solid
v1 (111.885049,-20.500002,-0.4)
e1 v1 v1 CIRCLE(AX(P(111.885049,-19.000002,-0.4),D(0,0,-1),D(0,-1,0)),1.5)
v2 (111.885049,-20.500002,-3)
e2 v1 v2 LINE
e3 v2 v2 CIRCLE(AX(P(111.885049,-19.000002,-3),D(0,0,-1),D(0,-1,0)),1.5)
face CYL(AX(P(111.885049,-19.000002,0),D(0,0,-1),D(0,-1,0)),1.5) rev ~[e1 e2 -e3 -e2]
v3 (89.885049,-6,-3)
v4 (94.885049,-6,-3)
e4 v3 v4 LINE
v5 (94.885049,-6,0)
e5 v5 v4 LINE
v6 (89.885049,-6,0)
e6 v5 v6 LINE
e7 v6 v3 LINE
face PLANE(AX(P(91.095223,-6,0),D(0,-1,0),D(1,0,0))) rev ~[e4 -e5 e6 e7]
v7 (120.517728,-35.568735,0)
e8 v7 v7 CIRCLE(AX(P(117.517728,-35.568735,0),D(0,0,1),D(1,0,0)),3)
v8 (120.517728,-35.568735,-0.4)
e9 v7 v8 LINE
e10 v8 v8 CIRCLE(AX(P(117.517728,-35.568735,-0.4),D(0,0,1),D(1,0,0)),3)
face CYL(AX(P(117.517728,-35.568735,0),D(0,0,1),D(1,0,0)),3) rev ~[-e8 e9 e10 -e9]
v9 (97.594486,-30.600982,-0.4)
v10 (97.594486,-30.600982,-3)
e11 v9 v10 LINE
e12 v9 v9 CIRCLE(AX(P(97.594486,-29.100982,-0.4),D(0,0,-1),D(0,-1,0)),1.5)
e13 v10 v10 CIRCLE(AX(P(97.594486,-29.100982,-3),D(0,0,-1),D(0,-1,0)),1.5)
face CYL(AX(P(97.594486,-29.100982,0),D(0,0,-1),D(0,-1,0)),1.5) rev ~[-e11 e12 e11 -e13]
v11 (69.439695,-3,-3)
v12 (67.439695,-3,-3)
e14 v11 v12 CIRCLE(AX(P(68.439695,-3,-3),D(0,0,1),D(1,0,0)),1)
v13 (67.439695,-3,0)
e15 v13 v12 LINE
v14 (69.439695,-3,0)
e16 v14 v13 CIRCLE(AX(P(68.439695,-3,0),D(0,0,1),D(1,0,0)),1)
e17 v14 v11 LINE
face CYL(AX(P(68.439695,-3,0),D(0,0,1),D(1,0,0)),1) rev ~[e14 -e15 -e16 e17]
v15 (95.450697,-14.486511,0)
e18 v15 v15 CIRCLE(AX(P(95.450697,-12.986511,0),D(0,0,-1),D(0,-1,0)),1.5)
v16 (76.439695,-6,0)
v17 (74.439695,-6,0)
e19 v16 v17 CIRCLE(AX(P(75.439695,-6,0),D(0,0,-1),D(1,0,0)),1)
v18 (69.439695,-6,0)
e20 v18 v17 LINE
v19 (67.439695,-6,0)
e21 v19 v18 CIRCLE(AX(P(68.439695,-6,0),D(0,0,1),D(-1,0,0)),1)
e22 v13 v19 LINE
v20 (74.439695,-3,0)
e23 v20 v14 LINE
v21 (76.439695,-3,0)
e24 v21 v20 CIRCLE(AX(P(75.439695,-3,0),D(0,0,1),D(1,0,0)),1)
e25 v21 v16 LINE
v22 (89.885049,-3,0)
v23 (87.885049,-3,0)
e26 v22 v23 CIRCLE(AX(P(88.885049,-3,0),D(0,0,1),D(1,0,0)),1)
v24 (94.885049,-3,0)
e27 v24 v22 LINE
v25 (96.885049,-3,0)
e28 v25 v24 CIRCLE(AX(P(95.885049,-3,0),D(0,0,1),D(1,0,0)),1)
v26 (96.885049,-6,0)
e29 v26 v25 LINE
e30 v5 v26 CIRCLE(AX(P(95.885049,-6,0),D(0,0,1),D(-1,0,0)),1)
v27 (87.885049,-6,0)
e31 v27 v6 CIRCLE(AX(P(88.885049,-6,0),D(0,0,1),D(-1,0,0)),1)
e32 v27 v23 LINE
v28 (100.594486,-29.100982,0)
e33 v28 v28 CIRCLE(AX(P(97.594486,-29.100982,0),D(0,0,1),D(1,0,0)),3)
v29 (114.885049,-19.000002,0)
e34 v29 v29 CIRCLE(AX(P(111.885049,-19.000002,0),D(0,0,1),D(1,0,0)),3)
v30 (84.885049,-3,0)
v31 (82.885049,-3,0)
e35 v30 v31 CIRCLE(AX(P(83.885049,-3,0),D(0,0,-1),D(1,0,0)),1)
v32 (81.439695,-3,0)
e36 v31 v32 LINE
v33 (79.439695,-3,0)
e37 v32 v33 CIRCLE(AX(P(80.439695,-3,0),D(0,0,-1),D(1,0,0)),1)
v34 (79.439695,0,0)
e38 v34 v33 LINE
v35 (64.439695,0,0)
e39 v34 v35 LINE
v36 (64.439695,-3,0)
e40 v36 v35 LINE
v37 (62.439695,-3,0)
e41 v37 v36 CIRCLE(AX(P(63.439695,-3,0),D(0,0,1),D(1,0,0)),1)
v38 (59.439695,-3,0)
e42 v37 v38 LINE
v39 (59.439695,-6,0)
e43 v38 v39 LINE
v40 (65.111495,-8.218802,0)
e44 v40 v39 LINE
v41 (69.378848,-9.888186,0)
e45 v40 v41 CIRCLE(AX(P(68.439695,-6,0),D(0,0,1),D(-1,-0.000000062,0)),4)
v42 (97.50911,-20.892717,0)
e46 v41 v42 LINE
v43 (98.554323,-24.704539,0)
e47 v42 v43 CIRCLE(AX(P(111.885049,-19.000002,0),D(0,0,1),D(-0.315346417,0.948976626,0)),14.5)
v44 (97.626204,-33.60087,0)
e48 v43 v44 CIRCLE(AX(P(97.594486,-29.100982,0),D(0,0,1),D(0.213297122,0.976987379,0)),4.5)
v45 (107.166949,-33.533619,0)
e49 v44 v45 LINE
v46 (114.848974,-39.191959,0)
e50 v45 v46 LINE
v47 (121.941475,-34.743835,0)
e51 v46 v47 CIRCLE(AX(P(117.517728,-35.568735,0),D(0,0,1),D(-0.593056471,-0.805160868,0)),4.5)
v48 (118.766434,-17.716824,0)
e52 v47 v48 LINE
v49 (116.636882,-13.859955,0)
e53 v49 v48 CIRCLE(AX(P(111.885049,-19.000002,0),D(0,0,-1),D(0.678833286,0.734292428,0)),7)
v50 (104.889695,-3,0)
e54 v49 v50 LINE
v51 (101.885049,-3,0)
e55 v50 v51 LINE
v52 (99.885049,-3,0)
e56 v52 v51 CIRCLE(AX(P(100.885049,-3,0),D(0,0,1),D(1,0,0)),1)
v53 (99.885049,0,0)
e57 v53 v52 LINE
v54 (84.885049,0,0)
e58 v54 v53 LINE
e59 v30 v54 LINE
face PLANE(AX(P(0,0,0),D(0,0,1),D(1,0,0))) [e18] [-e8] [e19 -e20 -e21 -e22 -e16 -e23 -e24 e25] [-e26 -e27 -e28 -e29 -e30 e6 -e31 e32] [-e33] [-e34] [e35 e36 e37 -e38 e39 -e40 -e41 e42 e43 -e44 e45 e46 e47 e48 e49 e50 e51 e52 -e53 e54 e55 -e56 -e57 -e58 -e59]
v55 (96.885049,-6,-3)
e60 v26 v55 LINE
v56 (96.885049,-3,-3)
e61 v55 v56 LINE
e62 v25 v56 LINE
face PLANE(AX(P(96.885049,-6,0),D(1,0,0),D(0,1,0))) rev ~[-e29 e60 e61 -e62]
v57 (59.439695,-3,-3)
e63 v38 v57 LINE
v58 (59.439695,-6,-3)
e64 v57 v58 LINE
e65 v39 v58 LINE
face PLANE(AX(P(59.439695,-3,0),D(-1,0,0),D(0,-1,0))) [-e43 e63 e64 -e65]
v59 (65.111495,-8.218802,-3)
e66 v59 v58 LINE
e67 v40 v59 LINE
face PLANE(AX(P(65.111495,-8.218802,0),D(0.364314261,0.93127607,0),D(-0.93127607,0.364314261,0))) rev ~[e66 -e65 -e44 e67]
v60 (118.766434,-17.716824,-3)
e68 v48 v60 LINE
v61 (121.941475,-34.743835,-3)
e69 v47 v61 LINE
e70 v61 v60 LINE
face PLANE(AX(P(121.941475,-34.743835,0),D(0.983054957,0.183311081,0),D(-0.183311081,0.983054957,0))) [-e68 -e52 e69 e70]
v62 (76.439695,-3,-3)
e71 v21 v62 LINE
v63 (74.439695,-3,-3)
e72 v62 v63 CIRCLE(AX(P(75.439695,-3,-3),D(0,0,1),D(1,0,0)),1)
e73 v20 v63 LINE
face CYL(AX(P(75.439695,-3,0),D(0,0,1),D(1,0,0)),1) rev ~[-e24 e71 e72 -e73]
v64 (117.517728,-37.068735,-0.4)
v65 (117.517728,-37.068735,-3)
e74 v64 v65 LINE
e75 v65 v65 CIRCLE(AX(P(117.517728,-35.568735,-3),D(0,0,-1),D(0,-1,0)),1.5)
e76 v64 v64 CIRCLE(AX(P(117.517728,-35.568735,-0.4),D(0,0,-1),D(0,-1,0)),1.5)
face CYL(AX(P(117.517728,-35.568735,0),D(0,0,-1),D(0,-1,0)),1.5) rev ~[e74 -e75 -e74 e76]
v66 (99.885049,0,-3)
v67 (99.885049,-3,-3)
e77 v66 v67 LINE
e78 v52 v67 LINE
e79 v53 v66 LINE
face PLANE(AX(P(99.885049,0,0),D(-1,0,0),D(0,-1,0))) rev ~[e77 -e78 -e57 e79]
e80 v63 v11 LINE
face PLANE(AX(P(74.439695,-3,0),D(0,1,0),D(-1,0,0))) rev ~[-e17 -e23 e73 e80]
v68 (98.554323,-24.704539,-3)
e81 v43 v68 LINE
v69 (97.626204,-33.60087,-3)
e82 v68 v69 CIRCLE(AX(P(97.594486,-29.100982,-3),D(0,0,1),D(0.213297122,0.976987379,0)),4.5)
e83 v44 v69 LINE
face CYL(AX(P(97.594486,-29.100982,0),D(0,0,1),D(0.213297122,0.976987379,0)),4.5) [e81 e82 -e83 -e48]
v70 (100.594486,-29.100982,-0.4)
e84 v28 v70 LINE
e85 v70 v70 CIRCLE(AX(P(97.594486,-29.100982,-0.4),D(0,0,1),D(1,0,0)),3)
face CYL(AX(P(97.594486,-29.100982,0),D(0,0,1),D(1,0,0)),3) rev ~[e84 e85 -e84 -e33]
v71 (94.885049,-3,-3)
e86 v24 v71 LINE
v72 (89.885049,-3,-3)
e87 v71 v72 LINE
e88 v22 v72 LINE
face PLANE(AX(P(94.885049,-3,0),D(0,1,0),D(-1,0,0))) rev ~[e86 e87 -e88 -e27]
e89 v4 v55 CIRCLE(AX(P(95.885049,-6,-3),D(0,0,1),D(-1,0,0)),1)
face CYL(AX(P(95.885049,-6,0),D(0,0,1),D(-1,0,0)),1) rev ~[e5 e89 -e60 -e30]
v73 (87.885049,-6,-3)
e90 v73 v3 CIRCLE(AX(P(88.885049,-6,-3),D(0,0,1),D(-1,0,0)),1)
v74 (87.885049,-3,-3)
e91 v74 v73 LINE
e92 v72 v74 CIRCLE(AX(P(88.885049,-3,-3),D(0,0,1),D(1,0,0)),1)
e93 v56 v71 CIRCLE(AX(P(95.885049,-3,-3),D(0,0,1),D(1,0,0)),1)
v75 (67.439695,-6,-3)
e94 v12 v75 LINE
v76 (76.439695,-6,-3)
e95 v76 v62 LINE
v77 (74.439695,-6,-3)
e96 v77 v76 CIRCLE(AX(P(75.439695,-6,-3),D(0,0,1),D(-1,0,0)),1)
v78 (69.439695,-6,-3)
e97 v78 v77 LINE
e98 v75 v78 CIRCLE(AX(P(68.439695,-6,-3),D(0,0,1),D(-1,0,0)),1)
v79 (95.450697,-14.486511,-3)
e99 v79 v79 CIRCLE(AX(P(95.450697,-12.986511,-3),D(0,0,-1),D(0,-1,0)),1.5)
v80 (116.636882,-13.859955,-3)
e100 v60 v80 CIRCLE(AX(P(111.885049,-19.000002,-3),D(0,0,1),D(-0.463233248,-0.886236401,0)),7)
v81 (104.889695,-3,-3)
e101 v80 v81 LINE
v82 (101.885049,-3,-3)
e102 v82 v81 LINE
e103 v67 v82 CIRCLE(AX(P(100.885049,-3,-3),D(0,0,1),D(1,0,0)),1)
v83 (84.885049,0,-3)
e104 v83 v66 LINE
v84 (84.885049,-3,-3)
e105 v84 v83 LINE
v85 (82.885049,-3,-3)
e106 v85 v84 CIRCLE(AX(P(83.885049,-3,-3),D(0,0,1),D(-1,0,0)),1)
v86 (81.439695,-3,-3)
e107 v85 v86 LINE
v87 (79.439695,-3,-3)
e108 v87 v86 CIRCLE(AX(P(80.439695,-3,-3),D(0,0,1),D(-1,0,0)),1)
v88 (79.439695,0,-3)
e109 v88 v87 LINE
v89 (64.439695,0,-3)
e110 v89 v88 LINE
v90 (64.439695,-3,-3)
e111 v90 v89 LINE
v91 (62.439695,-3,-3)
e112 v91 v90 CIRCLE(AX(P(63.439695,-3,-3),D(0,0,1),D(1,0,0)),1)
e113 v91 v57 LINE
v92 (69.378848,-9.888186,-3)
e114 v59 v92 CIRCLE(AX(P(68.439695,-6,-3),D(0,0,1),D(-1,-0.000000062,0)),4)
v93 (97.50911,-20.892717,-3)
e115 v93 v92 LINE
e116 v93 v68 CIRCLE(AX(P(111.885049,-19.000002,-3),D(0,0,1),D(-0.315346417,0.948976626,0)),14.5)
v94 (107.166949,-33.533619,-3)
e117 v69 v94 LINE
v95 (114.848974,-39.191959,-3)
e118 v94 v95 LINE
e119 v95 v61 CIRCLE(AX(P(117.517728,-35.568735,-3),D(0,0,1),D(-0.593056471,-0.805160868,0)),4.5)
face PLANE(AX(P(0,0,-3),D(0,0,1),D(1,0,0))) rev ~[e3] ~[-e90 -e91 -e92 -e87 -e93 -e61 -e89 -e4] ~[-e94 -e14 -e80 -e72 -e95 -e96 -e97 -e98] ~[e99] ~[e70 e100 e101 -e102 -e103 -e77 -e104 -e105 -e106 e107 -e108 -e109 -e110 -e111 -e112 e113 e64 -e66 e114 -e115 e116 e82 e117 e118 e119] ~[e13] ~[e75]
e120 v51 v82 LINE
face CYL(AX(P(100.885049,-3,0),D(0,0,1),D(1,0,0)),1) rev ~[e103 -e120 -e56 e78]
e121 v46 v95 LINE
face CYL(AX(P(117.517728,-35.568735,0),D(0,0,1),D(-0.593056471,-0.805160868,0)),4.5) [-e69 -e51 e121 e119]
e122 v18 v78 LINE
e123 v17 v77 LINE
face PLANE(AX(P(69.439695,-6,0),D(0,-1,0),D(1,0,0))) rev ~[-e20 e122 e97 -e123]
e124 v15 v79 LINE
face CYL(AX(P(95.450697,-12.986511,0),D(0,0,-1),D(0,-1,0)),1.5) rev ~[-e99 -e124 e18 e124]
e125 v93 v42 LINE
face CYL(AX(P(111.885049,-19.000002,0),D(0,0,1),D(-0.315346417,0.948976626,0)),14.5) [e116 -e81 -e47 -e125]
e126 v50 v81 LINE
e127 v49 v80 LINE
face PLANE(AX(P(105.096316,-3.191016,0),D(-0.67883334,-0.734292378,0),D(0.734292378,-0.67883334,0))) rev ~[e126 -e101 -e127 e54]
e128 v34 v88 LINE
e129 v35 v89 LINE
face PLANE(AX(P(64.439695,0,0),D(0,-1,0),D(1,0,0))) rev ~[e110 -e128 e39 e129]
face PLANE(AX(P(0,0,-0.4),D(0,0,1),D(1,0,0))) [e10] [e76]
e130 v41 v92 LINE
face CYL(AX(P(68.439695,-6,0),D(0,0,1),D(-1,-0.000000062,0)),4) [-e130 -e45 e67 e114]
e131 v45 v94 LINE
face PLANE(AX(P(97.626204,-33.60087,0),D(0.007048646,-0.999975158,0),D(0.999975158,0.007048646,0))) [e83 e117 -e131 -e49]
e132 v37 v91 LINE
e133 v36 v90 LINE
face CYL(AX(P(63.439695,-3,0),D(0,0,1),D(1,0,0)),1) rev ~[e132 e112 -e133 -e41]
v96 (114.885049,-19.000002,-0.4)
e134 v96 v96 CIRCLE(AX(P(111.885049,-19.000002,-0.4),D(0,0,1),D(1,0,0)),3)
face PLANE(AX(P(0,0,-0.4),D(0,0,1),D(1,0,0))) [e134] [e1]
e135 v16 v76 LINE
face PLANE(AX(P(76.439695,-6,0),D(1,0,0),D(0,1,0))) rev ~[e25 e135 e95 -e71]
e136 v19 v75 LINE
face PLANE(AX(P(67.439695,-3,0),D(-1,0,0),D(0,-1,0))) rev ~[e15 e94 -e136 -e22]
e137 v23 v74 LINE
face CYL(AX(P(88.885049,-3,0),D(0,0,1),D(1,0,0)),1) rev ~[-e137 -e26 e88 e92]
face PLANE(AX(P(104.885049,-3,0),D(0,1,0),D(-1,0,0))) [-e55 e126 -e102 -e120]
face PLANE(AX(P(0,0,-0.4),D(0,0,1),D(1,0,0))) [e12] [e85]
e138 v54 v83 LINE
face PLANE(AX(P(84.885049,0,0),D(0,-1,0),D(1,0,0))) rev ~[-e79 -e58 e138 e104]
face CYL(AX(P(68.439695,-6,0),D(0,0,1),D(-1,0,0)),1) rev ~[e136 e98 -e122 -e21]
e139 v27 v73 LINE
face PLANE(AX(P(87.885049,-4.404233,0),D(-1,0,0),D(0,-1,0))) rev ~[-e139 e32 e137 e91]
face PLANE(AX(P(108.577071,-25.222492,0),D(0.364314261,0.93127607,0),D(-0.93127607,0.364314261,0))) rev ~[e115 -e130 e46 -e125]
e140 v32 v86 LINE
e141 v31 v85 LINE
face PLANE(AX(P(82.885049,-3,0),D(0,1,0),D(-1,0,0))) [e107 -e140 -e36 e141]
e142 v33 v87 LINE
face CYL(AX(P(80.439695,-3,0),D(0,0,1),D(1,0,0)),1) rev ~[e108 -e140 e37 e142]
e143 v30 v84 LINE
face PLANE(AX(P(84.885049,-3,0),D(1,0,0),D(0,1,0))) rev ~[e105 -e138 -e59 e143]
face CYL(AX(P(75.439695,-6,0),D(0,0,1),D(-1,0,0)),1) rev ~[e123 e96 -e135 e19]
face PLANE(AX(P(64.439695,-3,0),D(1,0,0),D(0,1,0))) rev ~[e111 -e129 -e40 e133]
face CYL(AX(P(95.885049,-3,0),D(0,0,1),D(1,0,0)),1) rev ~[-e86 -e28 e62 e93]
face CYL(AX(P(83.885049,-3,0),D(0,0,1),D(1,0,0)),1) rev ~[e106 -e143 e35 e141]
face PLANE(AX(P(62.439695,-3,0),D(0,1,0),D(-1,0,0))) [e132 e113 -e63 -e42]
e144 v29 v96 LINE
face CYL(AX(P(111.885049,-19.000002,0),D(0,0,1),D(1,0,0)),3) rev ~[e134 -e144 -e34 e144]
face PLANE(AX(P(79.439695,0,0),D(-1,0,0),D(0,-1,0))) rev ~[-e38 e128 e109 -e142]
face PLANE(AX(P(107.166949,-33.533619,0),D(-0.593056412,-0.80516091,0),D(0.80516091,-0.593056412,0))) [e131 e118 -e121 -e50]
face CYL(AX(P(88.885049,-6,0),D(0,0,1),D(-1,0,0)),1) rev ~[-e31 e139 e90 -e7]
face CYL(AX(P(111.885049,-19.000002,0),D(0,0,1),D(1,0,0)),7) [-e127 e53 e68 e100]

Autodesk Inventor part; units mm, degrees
ref_plane "YZ Plane" through (0, 0, 0) normal (1, 0, 0) x (0, 1, 0)
ref_plane "XZ Plane" through (0, 0, 0) normal (0, 1, 0) x (-1, 0, 0)
ref_plane "XY Plane" through (0, 0, 0) normal (0, 0, 1) x (1, 0, 0)
sketch "スケッチ2" plane through (0, 0, 0) normal (0, 0, 1) x (1, 0, 0)
  line L0 (-101.5, 47.999998) -> (108.5, 47.999998)
  circle A0 centre (111.885049, -19.000002) radius 4
  circle A1 centre (171.880735, -19.719469) radius 4
  circle A2 centre (111.885049, -19.000002) radius 7
  circle A3 centre (171.880735, -19.719469) radius 7
  line L1 (171.880735, -19.719469) -> (111.885049, -19.000002) construction
  line L2 (171.964673, -12.719973) -> (111.968987, -12.000505)
  line L3 (111.801111, -25.999499) -> (171.796797, -26.718966)
  arc A4 (171.796797, -26.718966) -> (171.964673, -12.719973) centre (171.880735, -19.719469) ccw
  arc A5 (111.968987, -12.000505) -> (111.801111, -25.999499) centre (111.885049, -19.000002) ccw
  line L4 (173.79611, -12.986614) -> (250.19065, -34.719469)
  circle A6 centre (241.981901, -63.574563) radius 30
  line L5 (268.180017, -78.191633) -> (221.951227, -41.241357)
  line L6 (221.951227, -41.241357) -> (169.96536, -26.452325)
  line L7 (271.981901, -113.136134) -> (271.981901, -54.819928)
  line L8 (111.885049, -19.000002) -> (111.885049, 40.999998) construction
  line L9 (118.885049, -19.000002) -> (118.885049, 40.999998)
  line L10 (104.885049, 40.999998) -> (104.885049, -19.000002)
  arc A7 (104.885049, -19.000002) -> (118.885049, -19.000002) centre (111.885049, -19.000002) ccw
  arc A8 (118.885049, 40.999998) -> (104.885049, 40.999998) centre (111.885049, 40.999998) ccw
  circle A9 centre (29.431847, 47.237971) radius 30
  line L11 (113.319325, 34.148513) -> (35.578743, 17.874462)
  line L12 (-0.558473, 47.999998) -> (57.548936, 36.777123)
  line L13 (57.548936, 36.777123) -> (110.450773, 47.851484)
  circle A10 centre (113.5, -20.000002) radius 68
  line L14 (321.963533, -82.955067) -> (60.270532, 100.284345)
  line L15 (259.189194, -39.000002) -> (111.885049, -19.000002)
  arc A11 (93.592427, -27.104845) -> (135.370976, -5.924402) centre (95.060351, 21.794105) ccw
  arc A12 (135.370976, -5.924402) -> (135.847591, -3.671647) centre (132.898992, -4.224609) ccw
  arc A13 (135.847591, -3.671647) -> (83.183341, 18.55647) centre (102.157897, -9.989602) ccw
  line L16 (111.885049, -19.000002) -> (112.689188, 40.994609) construction
  line L17 (118.88442, -19.093818) -> (119.688559, 40.900793)
  line L18 (105.689816, 41.088425) -> (104.885678, -18.906186)
  arc A14 (104.885678, -18.906186) -> (118.88442, -19.093818) centre (111.885049, -19.000002) ccw
  arc A15 (119.688559, 40.900793) -> (105.689816, 41.088425) centre (112.689188, 40.994609) ccw
  line L19 (164.994898, 47.999998) -> (164.994898, 25.999998)
  line L20 (164.994898, 25.999998) -> (327.494898, -102.000002)
  circle A16 centre (116.292557, -40.000002) radius 68
  circle A17 centre (-98.885049, -0.000002) radius 67.5
  line L21 (321.363327, -8.500986) -> (-152.668056, 78.49822)
  line L22 (104.889695, -3) -> (104.889695, 0)
  line L23 (104.889695, -3) -> (72.06562, -3)
  line L24 (72.06562, 0) -> (104.889695, 0)
  circle A18 centre (83.376901, -17.5) radius 13.85
  point P0 (0, 0)
  point P1 (141.882892, -19.359736)
  point P2 (111.885049, 10.999998)
  point P3 (105.885049, -0.000002)
  point P4 (105.885049, -0.000002)
  point P5 (23.732778, -42.728965)
  point P6 (112.287118, 10.997304)
  dimension "d31" = 8
  dimension "d32" = 8
  dimension "d33" = 3
  dimension "d34" = 3
  dimension "d35" = 60
  dimension "d36" = 14
  dimension "d37" = 14
  dimension "d38" = 60
  dimension "d39" = 14
  dimension "d40" = 60
  dimension "d41" = 14
  dimension "d42" = 6
  dimension "d43" = 35
  dimension "d44" = 13.271
  dimension "d45" = 14
  dimension "d46" = 20
  dimension "d47" = 15
  dimension "d48" = 22
  dimension "d49" = 150
  dimension "d50" = 162.5
  dimension "d51" = 0
  dimension "d52" = 136
  dimension "d53" = 136
  dimension "d54" = 135
  dimension "d55" = 38.2272
  dimension "d56" = 18
sketch "スケッチ1" plane through (0, 0, 0) normal (0, 0, 1) x (1, 0, 0)
  line L0 (-101.5, 47.999998) -> (108.5, 47.999998)
  circle A0 centre (111.885049, -19.000002) radius 4
  circle A1 centre (171.880735, -19.719469) radius 4
  circle A2 centre (111.885049, -19.000002) radius 7
  circle A3 centre (171.880735, -19.719469) radius 7
  line L1 (171.880735, -19.719469) -> (111.885049, -19.000002) construction
  line L2 (171.964673, -12.719973) -> (111.968987, -12.000505)
  line L3 (111.801111, -25.999499) -> (171.796797, -26.718966)
  arc A4 (171.796797, -26.718966) -> (171.964673, -12.719973) centre (171.880735, -19.719469) ccw
  arc A5 (111.968987, -12.000505) -> (111.801111, -25.999499) centre (111.885049, -19.000002) ccw
  line L4 (173.79611, -12.986614) -> (250.19065, -34.719469)
  circle A6 centre (241.981901, -63.574563) radius 30
  line L5 (268.180017, -78.191633) -> (221.951227, -41.241357)
  line L6 (221.951227, -41.241357) -> (169.96536, -26.452325)
  line L7 (271.981901, -113.136134) -> (271.981901, -54.819928)
  line L8 (111.885049, -19.000002) -> (111.885049, 40.999998) construction
  line L9 (118.885049, -19.000002) -> (118.885049, 40.999998)
  line L10 (104.885049, 40.999998) -> (104.885049, -19.000002)
  arc A7 (104.885049, -19.000002) -> (118.885049, -19.000002) centre (111.885049, -19.000002) ccw
  arc A8 (118.885049, 40.999998) -> (104.885049, 40.999998) centre (111.885049, 40.999998) ccw
  circle A9 centre (29.431847, 47.237971) radius 30
  line L11 (113.319325, 34.148513) -> (35.578743, 17.874462)
  line L12 (-0.558473, 47.999998) -> (57.548936, 36.777123)
  line L13 (57.548936, 36.777123) -> (110.450773, 47.851484)
  circle A10 centre (113.5, -20.000002) radius 68
  line L14 (321.963533, -82.955067) -> (60.270532, 100.284345)
  line L15 (259.189194, -39.000002) -> (111.885049, -19.000002)
  arc A11 (93.592427, -27.104845) -> (135.370976, -5.924402) centre (95.060351, 21.794105) ccw
  arc A12 (135.370976, -5.924402) -> (135.847591, -3.671647) centre (132.898992, -4.224609) ccw
  arc A13 (135.847591, -3.671647) -> (83.183341, 18.55647) centre (102.157897, -9.989602) ccw
  line L16 (111.885049, -19.000002) -> (112.689188, 40.994609) construction
  line L17 (118.88442, -19.093818) -> (119.688559, 40.900793)
  line L18 (105.689816, 41.088425) -> (104.885678, -18.906186)
  arc A14 (104.885678, -18.906186) -> (118.88442, -19.093818) centre (111.885049, -19.000002) ccw
  arc A15 (119.688559, 40.900793) -> (105.689816, 41.088425) centre (112.689188, 40.994609) ccw
  line L19 (164.994898, 47.999998) -> (164.994898, 25.999998)
  line L20 (164.994898, 25.999998) -> (327.494898, -102.000002)
  circle A16 centre (116.292557, -40.000002) radius 68
  circle A17 centre (-98.885049, -0.000002) radius 67.5
  line L21 (321.363327, -8.500986) -> (-152.668056, 78.49822)
  line L22 (104.889695, -3) -> (104.889695, 0)
  line L23 (72.06562, 0) -> (104.889695, 0)
  circle A18 centre (83.376901, -17.5) radius 13.85
  line L24 (104.889695, -3) -> (116.636882, -13.859955)
  line L25 (109.334849, -25.518934) -> (59.439695, -6)
  line L26 (94.885049, -3) -> (89.885049, -3)
  line L27 (87.885049, -3) -> (87.885049, -6)
  line L28 (89.885049, -6) -> (94.885049, -6)
  line L29 (96.885049, -6) -> (96.885049, -3)
  line L30 (74.439695, -3) -> (69.439695, -3)
  line L31 (67.439695, -3) -> (67.439695, -6)
  line L32 (69.439695, -6) -> (74.439695, -6)
  line L33 (76.439695, -6) -> (76.439695, -3)
  line L34 (59.439695, -3) -> (59.439695, -6)
  arc A19 (67.439695, -6) -> (69.439695, -6) centre (68.439695, -6) ccw
  arc A20 (74.439695, -6) -> (76.439695, -6) centre (75.439695, -6) ccw
  arc A21 (76.439695, -3) -> (74.439695, -3) centre (75.439695, -3) ccw
  arc A22 (69.439695, -3) -> (67.439695, -3) centre (68.439695, -3) ccw
  arc A23 (87.885049, -6) -> (89.885049, -6) centre (88.885049, -6) ccw
  arc A24 (94.885049, -6) -> (96.885049, -6) centre (95.885049, -6) ccw
  arc A25 (96.885049, -3) -> (94.885049, -3) centre (95.885049, -3) ccw
  arc A26 (89.885049, -3) -> (87.885049, -3) centre (88.885049, -3) ccw
  line L35 (104.889695, -3) -> (96.885049, -3)
  line L36 (94.885049, -3) -> (89.885049, -3)
  line L37 (87.885049, -3) -> (76.439695, -3)
  line L38 (74.439695, -3) -> (69.439695, -3)
  line L39 (67.439695, -3) -> (59.439695, -3)
  line L40 (84.885049, -3) -> (84.885049, -6)
  arc A27 (84.885049, -6) -> (91.5308, -9) centre (88.885049, -6) ccw
  line L41 (91.5308, -9) -> (93.239298, -9)
  arc A28 (93.239298, -9) -> (99.885049, -6) centre (95.885049, -6) ccw
  line L42 (99.885049, -6) -> (99.885049, -3)
  line L43 (79.439695, -3) -> (79.439695, -6)
  arc A29 (72.793944, -9) -> (79.439695, -6) centre (75.439695, -6) ccw
  line L44 (72.793944, -9) -> (71.085447, -9)
  arc A30 (64.439695, -6) -> (71.085447, -9) centre (68.439695, -6) ccw
  line L45 (64.439695, -6) -> (64.439695, -3)
  line L46 (84.885049, -3) -> (84.885049, 0)
  line L47 (84.885049, 0) -> (99.885049, 0)
  line L48 (99.885049, 0) -> (99.885049, -3)
  line L49 (87.885049, -3) -> (84.885049, -3)
  line L50 (99.885049, -3) -> (96.885049, -3)
  line L51 (94.885049, -3) -> (89.885049, -3)
  line L52 (64.439695, -3) -> (64.439695, 0)
  line L53 (64.439695, 0) -> (79.439695, 0)
  line L54 (79.439695, 0) -> (79.439695, -3)
  line L55 (79.439695, -3) -> (76.439695, -3)
  line L56 (74.439695, -3) -> (69.439695, -3)
  line L57 (67.439695, -3) -> (64.439695, -3)
  circle A31 centre (63.439695, -3) radius 1
  circle A32 centre (83.885049, -3) radius 1
  circle A33 centre (80.439695, -3) radius 1
  circle A34 centre (100.885049, -3) radius 1
  point P0 (0, 0)
  point P1 (141.882892, -19.359736)
  point P2 (111.885049, 10.999998)
  point P3 (105.885049, -0.000002)
  point P4 (105.885049, -0.000002)
  point P5 (23.732778, -42.728965)
  point P6 (112.287118, 10.997304)
  point P7 (104.889695, -1.5)
  point P8 (101.885049, -3)
  point P9 (82.885049, -3)
  point P10 (81.439695, -3)
  point P11 (62.439695, -3)
  point P12 (65.111495, -8.218802)
  point P13 (69.378847, -9.888186)
  point P14 (108.577071, -25.222492)
  point P15 (108.642416, -25.203657)
  dimension "d0" = 8
  dimension "d1" = 8
  dimension "d2" = 3
  dimension "d3" = 3
  dimension "d4" = 60
  dimension "d5" = 14
  dimension "d6" = 14
  dimension "d7" = 60
  dimension "d8" = 14
  dimension "d9" = 60
  dimension "d10" = 14
  dimension "d11" = 6
  dimension "d12" = 35
  dimension "d13" = 13.271
  dimension "d14" = 14
  dimension "d15" = 20
  dimension "d16" = 15
  dimension "d17" = 22
  dimension "d18" = 150
  dimension "d19" = 162.5
  dimension "d20" = 0
  dimension "d21" = 136
  dimension "d22" = 136
  dimension "d23" = 135
  dimension "d24" = 38.2272
  dimension "d25" = 18
  dimension "d26" = 9
  dimension "d27" = 3
  dimension "d28" = 9
  dimension "d29" = 3
  dimension "d30" = 8
  dimension "d57" = 45.45
  dimension "d58" = 3
  dimension "d60" = 2
  dimension "d61" = 2
  dimension "d62" = 2
  dimension "d63" = 2
  dimension "d64" = 2
  dimension "d65" = 2
  dimension "d66" = 2
  dimension "d67" = 2
  dimension "d68" = 3
  dimension "d69" = 3
  dimension "d73" = 8
  dimension "d74" = 2
  dimension "d75" = 2
  dimension "d76" = 2
  dimension "d77" = 2
extrude "押し出し1" add sketch "スケッチ1" against normal blind 3 contours A2 A11 | L35 L24 L18 L10 | L10 A2 A11 L25 A18 A28 L42 A34 L35 | L48 L35 A25 L26 A26 L37 L46 L23 | L24 L2 A2 L18 | A11 A2 | L42 A28 A18 L28 A24 L29 L35 | L24 A2 L2 | L54 L37 A21 L30 A22 L39 L52 L53 L23 | L37 L27 A18 L40 | L40 A18 A32 | L25 A18 L44 A29 L43 A33 A32 L40 A27 L41 A28 | L43 A18 L33 L37 | A33 A18 L43 | A32 A18 A33 L37 | A18 L27 A23 L28 A28 L41 A27 L40 | L25 A30 L44 A18 | L43 A29 L44 A18 A20 L33 | L44 A30 L25 L45 L39 L31 A19 L32 A20 A18 | A30 L25 | L45 A30 L25 L34 L39 A31 | A0
hole "穴1" at (111.885049, -19.000002, 0) direction (0, 0, -1) diameter 3 depth 12 tip angle 118
sketch "スケッチ3" plane through (0, 0, 0) normal (0, 0, 1) x (1, 0, 0)
  circle A0 centre (111.885049, -19.000002) radius 1.5
  line L0 (89.885049, -6) -> (94.885049, -6)
  arc A1 (94.885049, -6) -> (96.885049, -6) centre (95.885049, -6) ccw
  line L1 (96.885049, -6) -> (96.885049, -3)
  arc A2 (96.885049, -3) -> (94.885049, -3) centre (95.885049, -3) ccw
  line L2 (94.885049, -3) -> (89.885049, -3)
  arc A3 (89.885049, -3) -> (87.885049, -3) centre (88.885049, -3) ccw
  line L3 (87.885049, -3) -> (87.885049, -6)
  arc A4 (87.885049, -6) -> (89.885049, -6) centre (88.885049, -6) ccw
  arc A5 (76.439695, -3) -> (74.439695, -3) centre (75.439695, -3) ccw
  line L4 (74.439695, -3) -> (69.439695, -3)
  arc A6 (69.439695, -3) -> (67.439695, -3) centre (68.439695, -3) ccw
  line L5 (67.439695, -3) -> (67.439695, -6)
  arc A7 (67.439695, -6) -> (69.439695, -6) centre (68.439695, -6) ccw
  line L6 (69.439695, -6) -> (74.439695, -6)
  arc A8 (74.439695, -6) -> (76.439695, -6) centre (75.439695, -6) ccw
  line L7 (76.439695, -6) -> (76.439695, -3)
  line L8 (64.439695, -3) -> (64.439695, 0)
  line L9 (64.439695, 0) -> (79.439695, 0)
  line L10 (79.439695, 0) -> (79.439695, -3)
  arc A9 (79.439695, -3) -> (81.439695, -3) centre (80.439695, -3) ccw
  line L11 (81.439695, -3) -> (82.885049, -3)
  arc A10 (82.885049, -3) -> (84.885049, -3) centre (83.885049, -3) ccw
  line L12 (84.885049, -3) -> (84.885049, 0)
  line L13 (84.885049, 0) -> (99.885049, 0)
  line L14 (99.885049, 0) -> (99.885049, -3)
  arc A11 (99.885049, -3) -> (101.885049, -3) centre (100.885049, -3) ccw
  line L15 (101.885049, -3) -> (104.889695, -3)
  line L16 (104.889695, -3) -> (116.636882, -13.859955)
  arc A12 (108.642416, -25.203657) -> (116.636882, -13.859955) centre (111.885049, -19.000002) ccw
  arc A13 (108.577071, -25.222492) -> (108.642416, -25.203657) centre (95.060351, 21.794105) ccw
  line L17 (108.577071, -25.222492) -> (69.378847, -9.888186)
  arc A14 (65.111495, -8.218802) -> (69.378847, -9.888186) centre (68.439695, -6) ccw
  line L18 (65.111495, -8.218802) -> (59.439695, -6)
  line L19 (59.439695, -6) -> (59.439695, -3)
  line L20 (59.439695, -3) -> (62.439695, -3)
  arc A15 (62.439695, -3) -> (64.439695, -3) centre (63.439695, -3) ccw
  circle A16 centre (111.885049, -19.000002) radius 9
  circle A17 centre (111.885049, -19.000002) radius 9.5
  line L21 (111.801111, -25.999499) -> (171.796797, -26.718966)
  circle A18 centre (111.885049, -19.000002) radius 14.5
  line L22 (111.741155, -30.999139) -> (171.736842, -31.718607)
  line L23 (93.239298, -9) -> (91.5308, -9)
  arc A19 (84.885049, -6) -> (91.5308, -9) centre (88.885049, -6) ccw
  line L24 (84.885049, -6) -> (84.885049, -3)
  arc A20 (91.5308, 0) -> (84.885049, -3) centre (88.885049, -3) ccw
  line L25 (91.5308, 0) -> (93.239298, 0)
  arc A21 (99.885049, -3) -> (93.239298, 0) centre (95.885049, -3) ccw
  line L26 (99.885049, -3) -> (99.885049, -6)
  arc A22 (93.239298, -9) -> (99.885049, -6) centre (95.885049, -6) ccw
  line L27 (72.793944, -9) -> (71.085447, -9)
  arc A23 (64.439695, -6) -> (71.085447, -9) centre (68.439695, -6) ccw
  line L28 (64.439695, -6) -> (64.439695, -3)
  arc A24 (71.085447, 0) -> (64.439695, -3) centre (68.439695, -3) ccw
  line L29 (71.085447, 0) -> (72.793944, 0)
  arc A25 (79.439695, -3) -> (72.793944, 0) centre (75.439695, -3) ccw
  line L30 (79.439695, -3) -> (79.439695, -6)
  arc A26 (72.793944, -9) -> (79.439695, -6) centre (75.439695, -6) ccw
  line L31 (69.232457, -6.609532) -> (108.707488, -22.052125)
  arc A27 (108.707488, -22.052125) -> (109.14454, -21.913696) centre (95.060351, 21.794105) ccw
  arc A28 (109.14454, -21.913696) -> (114.600382, -16.062832) centre (111.885049, -19.000002) ccw
  line L32 (114.600382, -16.062832) -> (103.715441, -6)
  line L33 (103.715441, -6) -> (103.5308, -6)
  arc A29 (96.885049, -3) -> (103.5308, -6) centre (100.885049, -3) ccw
  line L34 (96.885049, -3) -> (87.885049, -3)
  arc A30 (82.162372, -6.610039) -> (87.885049, -3) centre (83.885049, -3) ccw
  arc A31 (76.439695, -3) -> (82.162372, -6.610039) centre (80.439695, -3) ccw
  line L35 (76.439695, -3) -> (67.439695, -3)
  arc A32 (66.522117, -5.54925) -> (67.439695, -3) centre (63.439695, -3) ccw
  line L36 (66.522117, -5.54925) -> (67.443772, -5.9098)
  arc A33 (67.443772, -5.9098) -> (69.232457, -6.609532) centre (68.439695, -6) ccw
  circle A34 centre (111.885049, -19.000002) radius 1.5
  line L37 (111.885049, -19.000002) -> (111.885049, 12.517364) construction
  line L38 (118.885049, -19.000002) -> (118.885049, 12.517364)
  line L39 (104.885049, 12.517364) -> (104.885049, -19.000002)
  arc A35 (104.885049, -19.000002) -> (118.885049, -19.000002) centre (111.885049, -19.000002) ccw
  arc A36 (118.885049, 12.517364) -> (104.885049, 12.517364) centre (111.885049, 12.517364) ccw
  circle A37 centre (95.450697, -12.986511) radius 3
  circle A38 centre (117.517728, -35.568735) radius 4.5
  circle A39 centre (71.939695, -13.745967) radius 4.5
  line L40 (114.848974, -39.191959) -> (103.285731, -30.674835)
  line L41 (106.485085, -32.456985) -> (70.263844, -17.922272)
  line L42 (121.941475, -34.743835) -> (118.766434, -17.716824)
  arc A40 (108.642416, -25.203657) -> (116.636882, -13.859955) centre (111.885049, -19.000002) ccw
  circle A41 centre (117.517728, -35.568735) radius 3
  circle A42 centre (97.594486, -29.100982) radius 3
  circle A43 centre (97.594486, -29.100982) radius 4.5
  circle A44 centre (83.376901, -17.5) radius 13.85
  line L43 (111.987254, -33.499642) -> (97.626204, -33.60087)
  point P0 (0, 0)
  point P1 (111.885049, -3.241319)
  point P2 (69.528251, -9.946633)
  point P3 (118.885049, -18.352931)
  point P4 (118.766434, -17.716824)
  point P5 (121.094196, -30.200074)
  point P6 (104.771972, -31.769554)
  point P7 (97.50911, -20.892717)
  point P8 (107.312526, -5.239841)
  point P9 (104.885049, -6.301577)
  point P10 (104.885049, -3)
  point P11 (98.554323, -24.704539)
  point P12 (107.166949, -33.533619)
  dimension "d104" = 9
  dimension "d128" = 9
  dimension "d91" = 18
  dimension "d92" = 0.5
  dimension "d93" = 5
  dimension "d94" = 5
  dimension "d96" = 3
  dimension "d97" = 3
  dimension "d98" = 3
  dimension "d99" = 14
  dimension "d102" = 6
  dimension "d103" = 9
  dimension "d126" = 6
  dimension "d127" = 6
sketch "スケッチ3 outline for 押し出し2" plane through (0, 0, 0) normal (0, 0, 1) x (1, 0, 0)
  line L0 (116.636882, -13.859955) -> (107.312526, -5.239841)
  arc A0 (107.312526, -5.239841) -> (98.554323, -24.704539) centre (111.885049, -19.000002) ccw
  arc A1 (98.554323, -24.704539) -> (97.626204, -33.60087) centre (97.594486, -29.100982) ccw
  line L1 (97.626204, -33.60087) -> (107.166949, -33.533619)
  line L2 (107.166949, -33.533619) -> (114.848974, -39.191959)
  arc A2 (114.848974, -39.191959) -> (121.941475, -34.743835) centre (117.517728, -35.568735) ccw
  line L3 (121.941475, -34.743835) -> (118.766434, -17.716824)
  arc A3 (118.766434, -17.716824) -> (116.636882, -13.859955) centre (111.885049, -19.000002) ccw
  circle A4 centre (111.885049, -19.000002) radius 1.5
extrude "押し出し2" add sketch "スケッチ3 outline for 押し出し2" against normal blind 3
hole "穴2" at (71.939695, -13.745967, 0) at (95.450697, -12.986511, 0) at (117.517728, -35.568735, 0) at (97.594486, -29.100982, 0) direction (0, 0, -1) diameter 3 depth 12 tip angle 118
sketch "スケッチ4" plane through (0, 0, 0) normal (0, 0, 1) x (1, 0, 0)
  circle A0 centre (111.885049, -19.000002) radius 1.5
  line L0 (89.885049, -6) -> (94.885049, -6)
  arc A1 (94.885049, -6) -> (96.885049, -6) centre (95.885049, -6) ccw
  line L1 (96.885049, -6) -> (96.885049, -3)
  arc A2 (96.885049, -3) -> (94.885049, -3) centre (95.885049, -3) ccw
  line L2 (94.885049, -3) -> (89.885049, -3)
  arc A3 (89.885049, -3) -> (87.885049, -3) centre (88.885049, -3) ccw
  line L3 (87.885049, -3) -> (87.885049, -6)
  arc A4 (87.885049, -6) -> (89.885049, -6) centre (88.885049, -6) ccw
  arc A5 (76.439695, -3) -> (74.439695, -3) centre (75.439695, -3) ccw
  line L4 (74.439695, -3) -> (69.439695, -3)
  arc A6 (69.439695, -3) -> (67.439695, -3) centre (68.439695, -3) ccw
  line L5 (67.439695, -3) -> (67.439695, -6)
  arc A7 (67.439695, -6) -> (69.439695, -6) centre (68.439695, -6) ccw
  line L6 (69.439695, -6) -> (74.439695, -6)
  arc A8 (74.439695, -6) -> (76.439695, -6) centre (75.439695, -6) ccw
  line L7 (76.439695, -6) -> (76.439695, -3)
  line L8 (64.439695, -3) -> (64.439695, 0)
  line L9 (64.439695, 0) -> (79.439695, 0)
  line L10 (79.439695, 0) -> (79.439695, -3)
  arc A9 (79.439695, -3) -> (81.439695, -3) centre (80.439695, -3) ccw
  line L11 (81.439695, -3) -> (82.885049, -3)
  arc A10 (82.885049, -3) -> (84.885049, -3) centre (83.885049, -3) ccw
  line L12 (84.885049, -3) -> (84.885049, 0)
  line L13 (84.885049, 0) -> (99.885049, 0)
  line L14 (99.885049, 0) -> (99.885049, -3)
  arc A11 (99.885049, -3) -> (101.885049, -3) centre (100.885049, -3) ccw
  line L15 (101.885049, -3) -> (104.889695, -3)
  line L16 (104.889695, -3) -> (116.636882, -13.859955)
  arc A12 (108.642416, -25.203657) -> (116.636882, -13.859955) centre (111.885049, -19.000002) ccw
  arc A13 (108.577071, -25.222492) -> (108.642416, -25.203657) centre (95.060351, 21.794105) ccw
  line L17 (108.577071, -25.222492) -> (69.378847, -9.888186)
  arc A14 (65.111495, -8.218802) -> (69.378847, -9.888186) centre (68.439695, -6) ccw
  line L18 (65.111495, -8.218802) -> (59.439695, -6)
  line L19 (59.439695, -6) -> (59.439695, -3)
  line L20 (59.439695, -3) -> (62.439695, -3)
  arc A15 (62.439695, -3) -> (64.439695, -3) centre (63.439695, -3) ccw
  circle A16 centre (111.885049, -19.000002) radius 9
  circle A17 centre (111.885049, -19.000002) radius 9.5
  line L21 (111.801111, -25.999499) -> (171.796797, -26.718966)
  circle A18 centre (111.885049, -19.000002) radius 14.5
  line L22 (111.741155, -30.999139) -> (171.736842, -31.718607)
  line L23 (93.239298, -9) -> (91.5308, -9)
  arc A19 (84.885049, -6) -> (91.5308, -9) centre (88.885049, -6) ccw
  line L24 (84.885049, -6) -> (84.885049, -3)
  arc A20 (91.5308, 0) -> (84.885049, -3) centre (88.885049, -3) ccw
  line L25 (91.5308, 0) -> (93.239298, 0)
  arc A21 (99.885049, -3) -> (93.239298, 0) centre (95.885049, -3) ccw
  line L26 (99.885049, -3) -> (99.885049, -6)
  arc A22 (93.239298, -9) -> (99.885049, -6) centre (95.885049, -6) ccw
  line L27 (72.793944, -9) -> (71.085447, -9)
  arc A23 (64.439695, -6) -> (71.085447, -9) centre (68.439695, -6) ccw
  line L28 (64.439695, -6) -> (64.439695, -3)
  arc A24 (71.085447, 0) -> (64.439695, -3) centre (68.439695, -3) ccw
  line L29 (71.085447, 0) -> (72.793944, 0)
  arc A25 (79.439695, -3) -> (72.793944, 0) centre (75.439695, -3) ccw
  line L30 (79.439695, -3) -> (79.439695, -6)
  arc A26 (72.793944, -9) -> (79.439695, -6) centre (75.439695, -6) ccw
  line L31 (69.232457, -6.609532) -> (108.707488, -22.052125)
  arc A27 (108.707488, -22.052125) -> (109.14454, -21.913696) centre (95.060351, 21.794105) ccw
  arc A28 (109.14454, -21.913696) -> (114.600382, -16.062832) centre (111.885049, -19.000002) ccw
  line L32 (114.600382, -16.062832) -> (103.715441, -6)
  line L33 (103.715441, -6) -> (103.5308, -6)
  arc A29 (96.885049, -3) -> (103.5308, -6) centre (100.885049, -3) ccw
  line L34 (96.885049, -3) -> (87.885049, -3)
  arc A30 (82.162372, -6.610039) -> (87.885049, -3) centre (83.885049, -3) ccw
  arc A31 (76.439695, -3) -> (82.162372, -6.610039) centre (80.439695, -3) ccw
  line L35 (76.439695, -3) -> (67.439695, -3)
  arc A32 (66.522117, -5.54925) -> (67.439695, -3) centre (63.439695, -3) ccw
  line L36 (66.522117, -5.54925) -> (67.443772, -5.9098)
  arc A33 (67.443772, -5.9098) -> (69.232457, -6.609532) centre (68.439695, -6) ccw
  circle A34 centre (111.885049, -19.000002) radius 1.5
  line L37 (111.885049, -19.000002) -> (111.885049, 12.517364) construction
  line L38 (118.885049, -19.000002) -> (118.885049, 12.517364)
  line L39 (104.885049, 12.517364) -> (104.885049, -19.000002)
  arc A35 (104.885049, -19.000002) -> (118.885049, -19.000002) centre (111.885049, -19.000002) ccw
  arc A36 (118.885049, 12.517364) -> (104.885049, 12.517364) centre (111.885049, 12.517364) ccw
  circle A37 centre (95.450697, -12.986511) radius 3
  circle A38 centre (121.10724, -35.611781) radius 4.5
  circle A39 centre (71.939695, -13.745967) radius 4.5
  line L40 (118.911469, -39.539705) -> (104.809788, -31.656648)
  line L41 (106.485085, -32.456985) -> (70.263844, -17.922272)
  line L42 (125.294797, -33.964248) -> (118.399027, -16.437173)
  arc A40 (108.642416, -25.203657) -> (116.636882, -13.859955) centre (111.885049, -19.000002) ccw
  point P0 (0, 0)
  point P1 (0, 0)
  point P2 (111.885049, -3.241319)
  point P3 (69.528251, -9.946633)
  point P4 (118.885049, -17.672502)
  point P5 (118.399027, -16.437173)
  point P6 (123.048154, -28.253924)
  point P7 (105.621764, -32.110555)
  point P8 (97.50911, -20.892717)
  point P9 (107.312526, -5.239841)
  point P10 (104.885049, -6.301577)
  point P11 (104.885049, -3)
  dimension "d124" = 9
  dimension "d114" = 18
  dimension "d115" = 0.5
  dimension "d116" = 5
  dimension "d117" = 5
  dimension "d118" = 3
  dimension "d119" = 3
  dimension "d120" = 3
  dimension "d121" = 14
  dimension "d122" = 6
  dimension "d123" = 9
sketch "スケッチ5" plane through (0, 0, 0) normal (0, 0, 1) x (1, 0, 0)
  circle A0 centre (117.517728, -35.568735) radius 1.5
  circle A1 centre (95.450697, -12.986511) radius 1.5
  circle A2 centre (97.594486, -29.100982) radius 1.5
  circle A3 centre (111.885049, -19.000002) radius 1.5
  line L0 (116.636882, -13.859955) -> (104.889695, -3)
  line L1 (104.889695, -3) -> (101.885049, -3)
  arc A4 (99.885049, -3) -> (101.885049, -3) centre (100.885049, -3) ccw
  line L2 (99.885049, -3) -> (99.885049, 0)
  line L3 (99.885049, 0) -> (84.885049, 0)
  line L4 (84.885049, 0) -> (84.885049, -3)
  arc A5 (82.885049, -3) -> (84.885049, -3) centre (83.885049, -3) ccw
  line L5 (82.885049, -3) -> (81.439695, -3)
  arc A6 (79.439695, -3) -> (81.439695, -3) centre (80.439695, -3) ccw
  line L6 (79.439695, -3) -> (79.439695, 0)
  line L7 (79.439695, 0) -> (64.439695, 0)
  line L8 (64.439695, 0) -> (64.439695, -3)
  arc A7 (62.439695, -3) -> (64.439695, -3) centre (63.439695, -3) ccw
  line L9 (62.439695, -3) -> (59.439695, -3)
  line L10 (59.439695, -3) -> (59.439695, -6)
  line L11 (59.439695, -6) -> (65.111495, -8.218802)
  arc A8 (65.111495, -8.218802) -> (69.378847, -9.888186) centre (68.439695, -6) ccw
  line L12 (69.378847, -9.888186) -> (97.50911, -20.892717)
  arc A9 (97.50911, -20.892717) -> (98.554323, -24.704539) centre (111.885049, -19.000002) ccw
  arc A10 (98.554323, -24.704539) -> (97.626204, -33.60087) centre (97.594486, -29.100982) ccw
  line L13 (97.626204, -33.60087) -> (107.166949, -33.533619)
  line L14 (107.166949, -33.533619) -> (114.848974, -39.191959)
  arc A11 (114.848974, -39.191959) -> (121.941475, -34.743835) centre (117.517728, -35.568735) ccw
  line L15 (121.941475, -34.743835) -> (118.766434, -17.716824)
  arc A12 (118.766434, -17.716824) -> (116.636882, -13.859955) centre (111.885049, -19.000002) ccw
  line L16 (69.439695, -3) -> (74.439695, -3)
  arc A13 (76.439695, -3) -> (74.439695, -3) centre (75.439695, -3) ccw
  line L17 (76.439695, -3) -> (76.439695, -6)
  arc A14 (74.439695, -6) -> (76.439695, -6) centre (75.439695, -6) ccw
  line L18 (74.439695, -6) -> (69.439695, -6)
  arc A15 (67.439695, -6) -> (69.439695, -6) centre (68.439695, -6) ccw
  line L19 (67.439695, -6) -> (67.439695, -3)
  arc A16 (69.439695, -3) -> (67.439695, -3) centre (68.439695, -3) ccw
  arc A17 (94.885049, -6) -> (96.885049, -6) centre (95.885049, -6) ccw
  line L20 (94.885049, -6) -> (89.885049, -6)
  arc A18 (87.885049, -6) -> (89.885049, -6) centre (88.885049, -6) ccw
  line L21 (87.885049, -6) -> (87.885049, -3)
  arc A19 (89.885049, -3) -> (87.885049, -3) centre (88.885049, -3) ccw
  line L22 (89.885049, -3) -> (94.885049, -3)
  arc A20 (96.885049, -3) -> (94.885049, -3) centre (95.885049, -3) ccw
  line L23 (96.885049, -3) -> (96.885049, -6)
  circle A21 centre (117.517728, -35.568735) radius 1.5
  circle A22 centre (117.517728, -35.568735) radius 3
  circle A23 centre (97.594486, -29.100982) radius 1.5
  circle A24 centre (97.594486, -29.100982) radius 3
  circle A25 centre (111.885049, -19.000002) radius 1.5
  circle A26 centre (111.885049, -19.000002) radius 3
  point P0 (0, 0)
  dimension "d129" = 6
  dimension "d130" = 6
  dimension "d133" = 6
extrude "押し出し3" cut sketch "スケッチ5" against normal blind 0.4 contours A0 | A2 | A22 | A24 | A26
sketch "スケッチ6" plane through (0, 0, 0) normal (0, 0, 1) x (1, 0, 0)
  point P0 (0, 0)
equation "\"d40\" = d38"
equation "\"d9\" = d7"
properties part number "後ろウィング固定フレーム"
